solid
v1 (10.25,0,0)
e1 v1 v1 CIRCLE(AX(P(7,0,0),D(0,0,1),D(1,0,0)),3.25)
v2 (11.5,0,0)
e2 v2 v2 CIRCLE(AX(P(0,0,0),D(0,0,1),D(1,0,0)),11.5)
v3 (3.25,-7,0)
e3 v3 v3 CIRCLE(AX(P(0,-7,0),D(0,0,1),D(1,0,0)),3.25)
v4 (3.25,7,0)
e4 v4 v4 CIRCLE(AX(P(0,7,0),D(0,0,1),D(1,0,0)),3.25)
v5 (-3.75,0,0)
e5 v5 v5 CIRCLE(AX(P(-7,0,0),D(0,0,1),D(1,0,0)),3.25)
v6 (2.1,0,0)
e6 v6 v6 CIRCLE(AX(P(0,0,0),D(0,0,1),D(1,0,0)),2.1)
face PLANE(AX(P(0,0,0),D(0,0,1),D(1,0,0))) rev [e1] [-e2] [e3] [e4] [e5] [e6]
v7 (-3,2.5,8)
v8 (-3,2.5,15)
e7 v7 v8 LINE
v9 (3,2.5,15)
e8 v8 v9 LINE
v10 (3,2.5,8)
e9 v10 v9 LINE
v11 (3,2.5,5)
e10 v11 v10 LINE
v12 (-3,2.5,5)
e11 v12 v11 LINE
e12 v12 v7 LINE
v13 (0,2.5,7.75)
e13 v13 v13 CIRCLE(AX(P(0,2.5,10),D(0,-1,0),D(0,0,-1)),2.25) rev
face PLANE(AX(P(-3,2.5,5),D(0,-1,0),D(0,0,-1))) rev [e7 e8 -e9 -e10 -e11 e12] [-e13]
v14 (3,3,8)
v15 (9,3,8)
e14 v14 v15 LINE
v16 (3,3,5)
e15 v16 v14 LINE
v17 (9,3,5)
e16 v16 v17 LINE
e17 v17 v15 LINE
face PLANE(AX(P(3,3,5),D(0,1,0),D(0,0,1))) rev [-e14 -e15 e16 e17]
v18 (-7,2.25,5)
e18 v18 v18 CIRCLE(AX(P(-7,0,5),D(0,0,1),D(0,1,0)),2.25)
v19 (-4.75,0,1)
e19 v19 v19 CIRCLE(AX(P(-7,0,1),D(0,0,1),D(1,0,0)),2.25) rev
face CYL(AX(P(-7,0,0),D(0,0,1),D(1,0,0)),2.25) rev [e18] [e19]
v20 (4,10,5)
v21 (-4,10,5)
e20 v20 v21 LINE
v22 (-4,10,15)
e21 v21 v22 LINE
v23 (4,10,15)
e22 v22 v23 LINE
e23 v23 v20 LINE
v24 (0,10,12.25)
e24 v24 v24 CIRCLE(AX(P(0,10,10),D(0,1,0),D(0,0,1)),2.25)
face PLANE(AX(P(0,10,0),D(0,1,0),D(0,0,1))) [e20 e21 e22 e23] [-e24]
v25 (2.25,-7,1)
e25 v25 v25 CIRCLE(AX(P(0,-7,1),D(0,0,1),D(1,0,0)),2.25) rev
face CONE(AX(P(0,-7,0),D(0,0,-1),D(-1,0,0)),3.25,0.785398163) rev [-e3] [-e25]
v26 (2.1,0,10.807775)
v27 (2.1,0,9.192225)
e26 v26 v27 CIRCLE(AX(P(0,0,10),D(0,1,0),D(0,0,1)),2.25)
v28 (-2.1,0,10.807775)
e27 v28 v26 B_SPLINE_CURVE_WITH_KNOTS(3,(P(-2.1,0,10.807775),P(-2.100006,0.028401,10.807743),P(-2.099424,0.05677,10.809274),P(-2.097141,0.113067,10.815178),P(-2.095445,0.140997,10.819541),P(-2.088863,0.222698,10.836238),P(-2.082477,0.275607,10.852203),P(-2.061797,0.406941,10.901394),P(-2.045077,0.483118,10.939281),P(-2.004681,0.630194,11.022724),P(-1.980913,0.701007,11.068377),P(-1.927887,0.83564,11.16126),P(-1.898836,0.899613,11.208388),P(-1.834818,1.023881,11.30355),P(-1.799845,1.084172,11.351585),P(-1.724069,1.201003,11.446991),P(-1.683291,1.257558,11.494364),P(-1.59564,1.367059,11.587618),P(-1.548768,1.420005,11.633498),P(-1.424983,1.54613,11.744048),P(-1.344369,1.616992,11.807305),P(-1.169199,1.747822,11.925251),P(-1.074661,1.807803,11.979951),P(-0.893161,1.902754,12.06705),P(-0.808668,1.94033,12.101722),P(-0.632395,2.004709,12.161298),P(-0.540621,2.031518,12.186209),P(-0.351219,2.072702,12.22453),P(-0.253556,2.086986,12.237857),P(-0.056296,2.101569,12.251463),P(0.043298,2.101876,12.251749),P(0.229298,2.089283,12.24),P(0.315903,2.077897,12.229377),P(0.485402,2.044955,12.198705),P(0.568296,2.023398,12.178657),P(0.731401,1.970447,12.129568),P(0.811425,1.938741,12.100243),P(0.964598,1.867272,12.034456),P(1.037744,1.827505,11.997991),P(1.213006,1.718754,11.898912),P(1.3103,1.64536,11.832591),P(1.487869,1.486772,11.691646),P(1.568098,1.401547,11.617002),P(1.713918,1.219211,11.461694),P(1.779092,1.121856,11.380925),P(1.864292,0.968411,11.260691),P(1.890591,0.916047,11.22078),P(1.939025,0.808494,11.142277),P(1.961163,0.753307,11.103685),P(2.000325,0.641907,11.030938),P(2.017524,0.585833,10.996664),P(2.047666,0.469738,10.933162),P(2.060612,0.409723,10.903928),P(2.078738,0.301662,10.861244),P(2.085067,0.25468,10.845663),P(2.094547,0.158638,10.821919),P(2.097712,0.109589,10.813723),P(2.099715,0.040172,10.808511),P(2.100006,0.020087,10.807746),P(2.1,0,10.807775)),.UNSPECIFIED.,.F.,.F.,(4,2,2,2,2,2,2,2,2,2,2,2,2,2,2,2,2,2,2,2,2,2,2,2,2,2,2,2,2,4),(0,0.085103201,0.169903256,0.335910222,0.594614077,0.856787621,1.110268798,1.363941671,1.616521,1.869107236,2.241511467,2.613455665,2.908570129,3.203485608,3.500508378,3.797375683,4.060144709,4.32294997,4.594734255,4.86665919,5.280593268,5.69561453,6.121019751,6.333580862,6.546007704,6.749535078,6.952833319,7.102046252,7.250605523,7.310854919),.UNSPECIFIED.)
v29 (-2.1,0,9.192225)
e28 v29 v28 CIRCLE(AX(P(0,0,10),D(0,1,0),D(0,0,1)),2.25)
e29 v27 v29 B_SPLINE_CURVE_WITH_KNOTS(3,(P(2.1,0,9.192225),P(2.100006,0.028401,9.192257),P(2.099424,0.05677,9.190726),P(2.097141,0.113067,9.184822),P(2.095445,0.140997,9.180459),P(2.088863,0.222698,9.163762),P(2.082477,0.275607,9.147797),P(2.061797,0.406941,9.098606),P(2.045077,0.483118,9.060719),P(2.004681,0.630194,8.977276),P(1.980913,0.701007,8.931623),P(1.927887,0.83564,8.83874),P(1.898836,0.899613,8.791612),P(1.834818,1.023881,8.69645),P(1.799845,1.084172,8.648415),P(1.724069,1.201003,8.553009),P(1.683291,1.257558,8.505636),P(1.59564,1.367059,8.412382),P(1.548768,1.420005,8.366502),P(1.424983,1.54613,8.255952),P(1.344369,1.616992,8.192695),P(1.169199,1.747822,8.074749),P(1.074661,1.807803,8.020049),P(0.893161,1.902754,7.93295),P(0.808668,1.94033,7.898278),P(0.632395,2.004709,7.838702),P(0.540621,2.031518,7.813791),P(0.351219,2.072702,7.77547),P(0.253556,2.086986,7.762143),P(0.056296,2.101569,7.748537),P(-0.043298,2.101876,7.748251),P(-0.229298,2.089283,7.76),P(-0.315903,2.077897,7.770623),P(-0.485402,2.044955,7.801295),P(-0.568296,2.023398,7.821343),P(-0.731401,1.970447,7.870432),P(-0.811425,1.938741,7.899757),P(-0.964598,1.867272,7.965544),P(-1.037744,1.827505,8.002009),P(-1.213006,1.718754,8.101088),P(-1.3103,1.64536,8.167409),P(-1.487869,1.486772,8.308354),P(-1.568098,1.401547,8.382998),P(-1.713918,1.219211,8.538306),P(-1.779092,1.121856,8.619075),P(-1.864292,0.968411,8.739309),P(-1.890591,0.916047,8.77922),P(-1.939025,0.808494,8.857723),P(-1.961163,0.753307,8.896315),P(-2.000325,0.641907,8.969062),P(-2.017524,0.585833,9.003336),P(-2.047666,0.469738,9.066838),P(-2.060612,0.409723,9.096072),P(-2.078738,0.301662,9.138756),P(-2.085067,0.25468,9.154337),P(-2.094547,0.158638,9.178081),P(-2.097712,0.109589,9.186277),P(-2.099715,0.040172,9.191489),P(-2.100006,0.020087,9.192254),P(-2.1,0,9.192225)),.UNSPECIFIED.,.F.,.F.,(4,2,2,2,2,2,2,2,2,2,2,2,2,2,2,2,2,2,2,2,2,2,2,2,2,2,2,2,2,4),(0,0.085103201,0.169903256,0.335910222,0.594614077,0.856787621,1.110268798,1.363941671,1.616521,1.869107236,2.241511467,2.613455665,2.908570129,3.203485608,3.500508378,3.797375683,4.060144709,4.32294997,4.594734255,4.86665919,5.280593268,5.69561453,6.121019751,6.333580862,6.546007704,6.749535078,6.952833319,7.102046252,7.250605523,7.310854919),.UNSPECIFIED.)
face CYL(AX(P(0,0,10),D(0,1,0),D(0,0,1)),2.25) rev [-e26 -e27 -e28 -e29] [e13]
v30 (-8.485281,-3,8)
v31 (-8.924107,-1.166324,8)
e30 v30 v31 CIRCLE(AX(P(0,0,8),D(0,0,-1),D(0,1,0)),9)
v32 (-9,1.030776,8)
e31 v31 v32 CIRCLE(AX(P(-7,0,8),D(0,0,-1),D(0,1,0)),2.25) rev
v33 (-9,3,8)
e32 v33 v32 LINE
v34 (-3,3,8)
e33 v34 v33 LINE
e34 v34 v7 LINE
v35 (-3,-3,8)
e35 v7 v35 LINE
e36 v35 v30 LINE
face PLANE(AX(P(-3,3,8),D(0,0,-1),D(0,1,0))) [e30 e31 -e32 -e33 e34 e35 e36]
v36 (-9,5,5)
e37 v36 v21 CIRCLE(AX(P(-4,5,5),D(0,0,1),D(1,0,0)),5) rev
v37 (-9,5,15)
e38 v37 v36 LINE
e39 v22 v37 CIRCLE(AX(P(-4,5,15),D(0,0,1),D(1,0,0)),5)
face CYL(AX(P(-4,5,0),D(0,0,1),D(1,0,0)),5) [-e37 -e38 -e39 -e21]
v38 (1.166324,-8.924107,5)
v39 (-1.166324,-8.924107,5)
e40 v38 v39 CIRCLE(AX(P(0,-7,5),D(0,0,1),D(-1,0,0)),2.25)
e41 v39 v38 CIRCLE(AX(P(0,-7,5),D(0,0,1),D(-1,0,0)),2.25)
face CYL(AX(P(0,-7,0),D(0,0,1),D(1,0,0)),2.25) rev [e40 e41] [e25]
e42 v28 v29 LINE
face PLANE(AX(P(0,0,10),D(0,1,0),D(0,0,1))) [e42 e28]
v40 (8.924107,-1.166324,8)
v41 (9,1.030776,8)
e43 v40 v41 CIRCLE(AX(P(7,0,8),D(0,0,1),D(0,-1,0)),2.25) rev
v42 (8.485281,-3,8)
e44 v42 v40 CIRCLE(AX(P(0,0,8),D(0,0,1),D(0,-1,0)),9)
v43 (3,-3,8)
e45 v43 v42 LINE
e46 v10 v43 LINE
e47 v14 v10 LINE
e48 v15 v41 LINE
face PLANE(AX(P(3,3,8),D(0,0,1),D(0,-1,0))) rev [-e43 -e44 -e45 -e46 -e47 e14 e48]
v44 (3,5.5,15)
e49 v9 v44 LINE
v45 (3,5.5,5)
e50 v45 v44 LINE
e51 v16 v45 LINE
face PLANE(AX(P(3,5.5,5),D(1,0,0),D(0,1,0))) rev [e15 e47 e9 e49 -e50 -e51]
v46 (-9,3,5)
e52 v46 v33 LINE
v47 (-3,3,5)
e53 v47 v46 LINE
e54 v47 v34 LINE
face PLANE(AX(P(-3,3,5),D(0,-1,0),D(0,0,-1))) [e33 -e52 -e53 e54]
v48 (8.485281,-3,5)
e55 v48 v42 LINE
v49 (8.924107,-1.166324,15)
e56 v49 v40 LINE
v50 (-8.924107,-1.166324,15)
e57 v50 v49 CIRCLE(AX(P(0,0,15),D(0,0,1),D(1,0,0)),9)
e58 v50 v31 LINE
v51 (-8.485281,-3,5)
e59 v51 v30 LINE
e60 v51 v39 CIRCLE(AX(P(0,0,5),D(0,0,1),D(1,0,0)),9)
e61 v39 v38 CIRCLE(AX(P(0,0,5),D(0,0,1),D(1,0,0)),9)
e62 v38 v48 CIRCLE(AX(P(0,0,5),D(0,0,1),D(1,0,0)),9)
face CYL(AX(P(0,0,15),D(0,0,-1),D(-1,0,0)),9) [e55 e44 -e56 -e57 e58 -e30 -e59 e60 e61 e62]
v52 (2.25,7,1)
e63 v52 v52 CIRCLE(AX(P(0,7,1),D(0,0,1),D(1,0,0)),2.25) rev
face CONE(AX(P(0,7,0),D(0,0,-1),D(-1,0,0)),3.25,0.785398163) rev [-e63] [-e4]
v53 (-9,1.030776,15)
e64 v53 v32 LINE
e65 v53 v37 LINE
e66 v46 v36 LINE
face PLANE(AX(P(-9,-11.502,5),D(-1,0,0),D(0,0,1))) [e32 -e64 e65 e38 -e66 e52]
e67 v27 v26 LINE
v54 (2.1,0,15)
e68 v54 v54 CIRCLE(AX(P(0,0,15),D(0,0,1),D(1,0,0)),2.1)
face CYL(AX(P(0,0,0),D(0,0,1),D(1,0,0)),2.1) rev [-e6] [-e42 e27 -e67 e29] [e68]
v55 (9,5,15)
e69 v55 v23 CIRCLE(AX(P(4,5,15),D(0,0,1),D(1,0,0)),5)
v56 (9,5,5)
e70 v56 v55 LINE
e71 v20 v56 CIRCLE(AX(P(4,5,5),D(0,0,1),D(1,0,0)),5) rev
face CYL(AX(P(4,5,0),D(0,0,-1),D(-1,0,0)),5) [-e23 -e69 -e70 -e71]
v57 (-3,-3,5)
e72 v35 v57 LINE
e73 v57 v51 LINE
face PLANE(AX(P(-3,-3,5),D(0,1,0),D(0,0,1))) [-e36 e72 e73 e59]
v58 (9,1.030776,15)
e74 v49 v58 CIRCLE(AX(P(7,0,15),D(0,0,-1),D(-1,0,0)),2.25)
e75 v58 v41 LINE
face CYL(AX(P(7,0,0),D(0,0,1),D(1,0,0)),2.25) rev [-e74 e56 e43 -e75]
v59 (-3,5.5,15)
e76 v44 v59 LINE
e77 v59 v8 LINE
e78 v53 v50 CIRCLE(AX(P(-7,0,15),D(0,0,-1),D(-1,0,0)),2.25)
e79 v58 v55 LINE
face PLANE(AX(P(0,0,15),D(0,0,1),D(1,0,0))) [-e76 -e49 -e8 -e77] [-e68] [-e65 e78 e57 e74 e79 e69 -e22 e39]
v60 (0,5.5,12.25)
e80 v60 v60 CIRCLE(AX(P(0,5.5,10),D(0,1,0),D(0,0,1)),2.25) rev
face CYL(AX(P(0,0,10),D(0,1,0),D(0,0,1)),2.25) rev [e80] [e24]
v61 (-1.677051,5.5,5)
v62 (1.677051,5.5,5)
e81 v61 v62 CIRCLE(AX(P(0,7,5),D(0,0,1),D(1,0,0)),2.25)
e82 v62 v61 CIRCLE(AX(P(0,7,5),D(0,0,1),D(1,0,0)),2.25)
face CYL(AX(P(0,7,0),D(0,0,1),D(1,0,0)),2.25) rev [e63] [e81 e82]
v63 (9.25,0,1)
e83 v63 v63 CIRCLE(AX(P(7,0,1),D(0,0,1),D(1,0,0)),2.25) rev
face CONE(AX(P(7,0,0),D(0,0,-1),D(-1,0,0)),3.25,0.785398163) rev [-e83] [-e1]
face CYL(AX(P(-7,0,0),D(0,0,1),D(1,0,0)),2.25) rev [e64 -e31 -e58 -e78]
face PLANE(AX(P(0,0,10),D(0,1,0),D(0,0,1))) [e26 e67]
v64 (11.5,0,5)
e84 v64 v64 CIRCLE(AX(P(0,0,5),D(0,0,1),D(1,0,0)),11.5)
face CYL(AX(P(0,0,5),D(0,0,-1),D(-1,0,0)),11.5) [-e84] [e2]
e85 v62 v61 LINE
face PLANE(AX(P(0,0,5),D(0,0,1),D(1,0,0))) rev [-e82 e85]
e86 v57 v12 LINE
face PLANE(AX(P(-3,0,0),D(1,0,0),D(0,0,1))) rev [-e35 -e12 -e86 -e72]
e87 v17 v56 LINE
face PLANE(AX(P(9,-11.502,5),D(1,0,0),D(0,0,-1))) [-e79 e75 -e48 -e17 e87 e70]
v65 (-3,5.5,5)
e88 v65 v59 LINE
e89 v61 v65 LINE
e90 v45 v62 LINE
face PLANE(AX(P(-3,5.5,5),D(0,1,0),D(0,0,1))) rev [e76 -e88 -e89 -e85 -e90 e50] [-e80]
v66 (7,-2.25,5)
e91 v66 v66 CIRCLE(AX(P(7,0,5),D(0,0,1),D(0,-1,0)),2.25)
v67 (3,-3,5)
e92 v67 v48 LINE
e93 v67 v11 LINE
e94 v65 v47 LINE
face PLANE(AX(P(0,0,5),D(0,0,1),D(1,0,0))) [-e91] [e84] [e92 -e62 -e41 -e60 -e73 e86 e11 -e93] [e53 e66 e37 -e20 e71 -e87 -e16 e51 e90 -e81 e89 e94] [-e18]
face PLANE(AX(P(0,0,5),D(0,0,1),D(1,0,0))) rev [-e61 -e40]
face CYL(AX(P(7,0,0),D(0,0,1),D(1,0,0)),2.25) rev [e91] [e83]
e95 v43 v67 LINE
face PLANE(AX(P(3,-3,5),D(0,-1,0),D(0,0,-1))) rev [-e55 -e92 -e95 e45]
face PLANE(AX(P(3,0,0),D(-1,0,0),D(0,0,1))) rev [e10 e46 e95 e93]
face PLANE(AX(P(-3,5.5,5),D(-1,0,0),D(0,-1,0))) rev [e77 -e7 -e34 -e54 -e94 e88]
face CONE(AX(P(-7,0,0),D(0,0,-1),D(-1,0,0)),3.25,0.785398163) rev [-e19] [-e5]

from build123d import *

# Parameters (mm, degrees)
SKETCH1_R           = 11.5
BOSS_EXTRUDE1_DEPTH = 5
SKETCH2_R           = 2.25
CUT_EXTRUDE1_DEPTH  = 18.014699527
CIRPATTERN1_COUNT   = 4
SKETCH3_R           = 9
BOSS_EXTRUDE2_DEPTH = 10
SKETCH4_R           = 2.1
CUT_EXTRUDE2_DEPTH  = 23.12464689
BOSS_EXTRUDE3_REACH = 30.627
SKETCH5_W           = 18
SKETCH5_H           = 10
SKETCH6_R           = 2.25
CUT_EXTRUDE3_DEPTH  = 10
CHAMFER2_SIZE       = 1
FILLET1_R           = 5
CUT_EXTRUDE4_DEPTH  = 20.091883144
SKETCH8_W           = 6
SKETCH8_H           = 3
CUT_EXTRUDE7_DEPTH  = 10
SKETCH9_W           = 3
SKETCH9_H           = 6
CUT_EXTRUDE8_DEPTH  = 6


with BuildPart() as part:
    # Sketch1 → Boss-Extrude1 (new body)
    with BuildSketch(Plane.XY):
        Circle(SKETCH1_R)
    extrude(amount=BOSS_EXTRUDE1_DEPTH)

    # Sketch2 → Cut-Extrude1 (cut, through all)
    with BuildSketch(Plane.XY.offset(5)):
        with Locations((0, 7)):
            Circle(SKETCH2_R)
    cut_extrude1 = extrude(amount=-CUT_EXTRUDE1_DEPTH, mode=Mode.SUBTRACT)

    # CirPattern1: Cut-Extrude1 ×4 about axis
    cirpattern1_axis = Axis((0, 0, 0), (0, 0, 1))
    for i in range(1, CIRPATTERN1_COUNT):
        add(cut_extrude1.rotate(cirpattern1_axis, i * 360 / CIRPATTERN1_COUNT), mode=Mode.SUBTRACT)

    # Sketch3 → Boss-Extrude2 (add)
    with BuildSketch(Plane.XY.offset(5)):
        with Locations(Location((0, 0, 0), (0, 0, 172.554009398))):
            Circle(SKETCH3_R)
    extrude(amount=BOSS_EXTRUDE2_DEPTH)

    # Sketch4 → Cut-Extrude2 (cut, through all)
    with BuildSketch(Plane.XY.offset(15)):
        Circle(SKETCH4_R)
    extrude(amount=-CUT_EXTRUDE2_DEPTH, mode=Mode.SUBTRACT)

    # Sketch5 → Boss-Extrude3 (add, up to next)
    with BuildSketch(Plane(origin=(0, 10, 0), x_dir=(1, 0, 0), z_dir=(0, 1, 0)), mode=Mode.PRIVATE) as boss_extrude3_sk1:
        with Locations((0, -10)):
            Rectangle(SKETCH5_W, SKETCH5_H)
    boss_extrude3_tool1 = extrude(boss_extrude3_sk1.sketch, amount=-BOSS_EXTRUDE3_REACH, mode=Mode.PRIVATE) - part.part
    add(boss_extrude3_tool1.solids().sort_by_distance((0, 10, 10))[0])

    # Sketch6 → Cut-Extrude3 (cut)
    with BuildSketch(Plane(origin=(0, 10, 0), x_dir=(1, 0, 0), z_dir=(0, 1, 0))):
        with Locations(Location((0, -10, 0), (0, 0, 270))):
            Circle(SKETCH6_R)
    extrude(amount=-CUT_EXTRUDE3_DEPTH, mode=Mode.SUBTRACT)

    # Chamfer2
    chamfer2_edges = [part.edges().sort_by_distance(p)[0] for p in [
        (-7, -2.25, 0),
        (2.25, -7, 0),
        (7, 2.25, 0),
        (-2.25, 7, 0),
    ]]
    chamfer(chamfer2_edges, length=CHAMFER2_SIZE)

    # Fillet1
    # the kernel refuses this fillet: 5 mm, written as the material it takes off along each edge
    with BuildSketch(Plane(origin=(-9, 10, 27.5), x_dir=(0, -1, 0), z_dir=(0, 0, -1)), Plane(origin=(9, 10, 5), x_dir=(0, -1, 0), z_dir=(0, 0, 1))) as fillet1_piece_1:
        with BuildLine():
            CenterArc((FILLET1_R, -FILLET1_R), FILLET1_R, 90, 90)
            Line((0, -FILLET1_R), (0, 0))
            Line((0, 0), (FILLET1_R, 0))
        make_face()
    extrude(amount=22.5, mode=Mode.SUBTRACT)

    # Sketch7 → Cut-Extrude4 (cut, through all)
    with BuildSketch(Plane(origin=(0, 0, 5), x_dir=(-1, 0, 0), z_dir=(0, 0, -1))):
        with BuildLine():
            Line((-9, 1.030776406), (-9, 0))
            ThreePointArc((-9, 0), (-8.981006744, -0.584395292), (-8.924107143, -1.166324013))
            ThreePointArc((-8.924107143, -1.166324013), (-4.751341115, 0.077673804), (-9, 1.030776406))
        make_face()
        with BuildLine():
            Line((9, 0), (9, 1.030776406))
            ThreePointArc((9, 1.030776406), (4.751341115, 0.077673804), (8.924107143, -1.166324013))
            ThreePointArc((8.924107143, -1.166324013), (8.981006744, -0.584395292), (9, 0))
        make_face()
    extrude(amount=-CUT_EXTRUDE4_DEPTH, mode=Mode.SUBTRACT)

    # Sketch8 → Cut-Extrude7 (cut)
    with BuildSketch(Plane.XY.offset(15)):
        with Locations((0, 4)):
            Rectangle(SKETCH8_W, SKETCH8_H)
    extrude(amount=-CUT_EXTRUDE7_DEPTH, mode=Mode.SUBTRACT)

    # Sketch9 → Cut-Extrude8 (cut)
    with BuildSketch(Plane(origin=(9, 0, 0), x_dir=(0, 0, -1), z_dir=(1, 0, 0))):
        with Locations((-6.5, 0)):
            Rectangle(SKETCH9_W, SKETCH9_H)
    cut_extrude8 = extrude(amount=-CUT_EXTRUDE8_DEPTH, mode=Mode.SUBTRACT)

    # Mirror1: Cut-Extrude8 across plane
    add(cut_extrude8.mirror(Plane(origin=(0, 0, 0), x_dir=(0, 0, 1), z_dir=(1, 0, 0))), mode=Mode.SUBTRACT)


solid = part.part
